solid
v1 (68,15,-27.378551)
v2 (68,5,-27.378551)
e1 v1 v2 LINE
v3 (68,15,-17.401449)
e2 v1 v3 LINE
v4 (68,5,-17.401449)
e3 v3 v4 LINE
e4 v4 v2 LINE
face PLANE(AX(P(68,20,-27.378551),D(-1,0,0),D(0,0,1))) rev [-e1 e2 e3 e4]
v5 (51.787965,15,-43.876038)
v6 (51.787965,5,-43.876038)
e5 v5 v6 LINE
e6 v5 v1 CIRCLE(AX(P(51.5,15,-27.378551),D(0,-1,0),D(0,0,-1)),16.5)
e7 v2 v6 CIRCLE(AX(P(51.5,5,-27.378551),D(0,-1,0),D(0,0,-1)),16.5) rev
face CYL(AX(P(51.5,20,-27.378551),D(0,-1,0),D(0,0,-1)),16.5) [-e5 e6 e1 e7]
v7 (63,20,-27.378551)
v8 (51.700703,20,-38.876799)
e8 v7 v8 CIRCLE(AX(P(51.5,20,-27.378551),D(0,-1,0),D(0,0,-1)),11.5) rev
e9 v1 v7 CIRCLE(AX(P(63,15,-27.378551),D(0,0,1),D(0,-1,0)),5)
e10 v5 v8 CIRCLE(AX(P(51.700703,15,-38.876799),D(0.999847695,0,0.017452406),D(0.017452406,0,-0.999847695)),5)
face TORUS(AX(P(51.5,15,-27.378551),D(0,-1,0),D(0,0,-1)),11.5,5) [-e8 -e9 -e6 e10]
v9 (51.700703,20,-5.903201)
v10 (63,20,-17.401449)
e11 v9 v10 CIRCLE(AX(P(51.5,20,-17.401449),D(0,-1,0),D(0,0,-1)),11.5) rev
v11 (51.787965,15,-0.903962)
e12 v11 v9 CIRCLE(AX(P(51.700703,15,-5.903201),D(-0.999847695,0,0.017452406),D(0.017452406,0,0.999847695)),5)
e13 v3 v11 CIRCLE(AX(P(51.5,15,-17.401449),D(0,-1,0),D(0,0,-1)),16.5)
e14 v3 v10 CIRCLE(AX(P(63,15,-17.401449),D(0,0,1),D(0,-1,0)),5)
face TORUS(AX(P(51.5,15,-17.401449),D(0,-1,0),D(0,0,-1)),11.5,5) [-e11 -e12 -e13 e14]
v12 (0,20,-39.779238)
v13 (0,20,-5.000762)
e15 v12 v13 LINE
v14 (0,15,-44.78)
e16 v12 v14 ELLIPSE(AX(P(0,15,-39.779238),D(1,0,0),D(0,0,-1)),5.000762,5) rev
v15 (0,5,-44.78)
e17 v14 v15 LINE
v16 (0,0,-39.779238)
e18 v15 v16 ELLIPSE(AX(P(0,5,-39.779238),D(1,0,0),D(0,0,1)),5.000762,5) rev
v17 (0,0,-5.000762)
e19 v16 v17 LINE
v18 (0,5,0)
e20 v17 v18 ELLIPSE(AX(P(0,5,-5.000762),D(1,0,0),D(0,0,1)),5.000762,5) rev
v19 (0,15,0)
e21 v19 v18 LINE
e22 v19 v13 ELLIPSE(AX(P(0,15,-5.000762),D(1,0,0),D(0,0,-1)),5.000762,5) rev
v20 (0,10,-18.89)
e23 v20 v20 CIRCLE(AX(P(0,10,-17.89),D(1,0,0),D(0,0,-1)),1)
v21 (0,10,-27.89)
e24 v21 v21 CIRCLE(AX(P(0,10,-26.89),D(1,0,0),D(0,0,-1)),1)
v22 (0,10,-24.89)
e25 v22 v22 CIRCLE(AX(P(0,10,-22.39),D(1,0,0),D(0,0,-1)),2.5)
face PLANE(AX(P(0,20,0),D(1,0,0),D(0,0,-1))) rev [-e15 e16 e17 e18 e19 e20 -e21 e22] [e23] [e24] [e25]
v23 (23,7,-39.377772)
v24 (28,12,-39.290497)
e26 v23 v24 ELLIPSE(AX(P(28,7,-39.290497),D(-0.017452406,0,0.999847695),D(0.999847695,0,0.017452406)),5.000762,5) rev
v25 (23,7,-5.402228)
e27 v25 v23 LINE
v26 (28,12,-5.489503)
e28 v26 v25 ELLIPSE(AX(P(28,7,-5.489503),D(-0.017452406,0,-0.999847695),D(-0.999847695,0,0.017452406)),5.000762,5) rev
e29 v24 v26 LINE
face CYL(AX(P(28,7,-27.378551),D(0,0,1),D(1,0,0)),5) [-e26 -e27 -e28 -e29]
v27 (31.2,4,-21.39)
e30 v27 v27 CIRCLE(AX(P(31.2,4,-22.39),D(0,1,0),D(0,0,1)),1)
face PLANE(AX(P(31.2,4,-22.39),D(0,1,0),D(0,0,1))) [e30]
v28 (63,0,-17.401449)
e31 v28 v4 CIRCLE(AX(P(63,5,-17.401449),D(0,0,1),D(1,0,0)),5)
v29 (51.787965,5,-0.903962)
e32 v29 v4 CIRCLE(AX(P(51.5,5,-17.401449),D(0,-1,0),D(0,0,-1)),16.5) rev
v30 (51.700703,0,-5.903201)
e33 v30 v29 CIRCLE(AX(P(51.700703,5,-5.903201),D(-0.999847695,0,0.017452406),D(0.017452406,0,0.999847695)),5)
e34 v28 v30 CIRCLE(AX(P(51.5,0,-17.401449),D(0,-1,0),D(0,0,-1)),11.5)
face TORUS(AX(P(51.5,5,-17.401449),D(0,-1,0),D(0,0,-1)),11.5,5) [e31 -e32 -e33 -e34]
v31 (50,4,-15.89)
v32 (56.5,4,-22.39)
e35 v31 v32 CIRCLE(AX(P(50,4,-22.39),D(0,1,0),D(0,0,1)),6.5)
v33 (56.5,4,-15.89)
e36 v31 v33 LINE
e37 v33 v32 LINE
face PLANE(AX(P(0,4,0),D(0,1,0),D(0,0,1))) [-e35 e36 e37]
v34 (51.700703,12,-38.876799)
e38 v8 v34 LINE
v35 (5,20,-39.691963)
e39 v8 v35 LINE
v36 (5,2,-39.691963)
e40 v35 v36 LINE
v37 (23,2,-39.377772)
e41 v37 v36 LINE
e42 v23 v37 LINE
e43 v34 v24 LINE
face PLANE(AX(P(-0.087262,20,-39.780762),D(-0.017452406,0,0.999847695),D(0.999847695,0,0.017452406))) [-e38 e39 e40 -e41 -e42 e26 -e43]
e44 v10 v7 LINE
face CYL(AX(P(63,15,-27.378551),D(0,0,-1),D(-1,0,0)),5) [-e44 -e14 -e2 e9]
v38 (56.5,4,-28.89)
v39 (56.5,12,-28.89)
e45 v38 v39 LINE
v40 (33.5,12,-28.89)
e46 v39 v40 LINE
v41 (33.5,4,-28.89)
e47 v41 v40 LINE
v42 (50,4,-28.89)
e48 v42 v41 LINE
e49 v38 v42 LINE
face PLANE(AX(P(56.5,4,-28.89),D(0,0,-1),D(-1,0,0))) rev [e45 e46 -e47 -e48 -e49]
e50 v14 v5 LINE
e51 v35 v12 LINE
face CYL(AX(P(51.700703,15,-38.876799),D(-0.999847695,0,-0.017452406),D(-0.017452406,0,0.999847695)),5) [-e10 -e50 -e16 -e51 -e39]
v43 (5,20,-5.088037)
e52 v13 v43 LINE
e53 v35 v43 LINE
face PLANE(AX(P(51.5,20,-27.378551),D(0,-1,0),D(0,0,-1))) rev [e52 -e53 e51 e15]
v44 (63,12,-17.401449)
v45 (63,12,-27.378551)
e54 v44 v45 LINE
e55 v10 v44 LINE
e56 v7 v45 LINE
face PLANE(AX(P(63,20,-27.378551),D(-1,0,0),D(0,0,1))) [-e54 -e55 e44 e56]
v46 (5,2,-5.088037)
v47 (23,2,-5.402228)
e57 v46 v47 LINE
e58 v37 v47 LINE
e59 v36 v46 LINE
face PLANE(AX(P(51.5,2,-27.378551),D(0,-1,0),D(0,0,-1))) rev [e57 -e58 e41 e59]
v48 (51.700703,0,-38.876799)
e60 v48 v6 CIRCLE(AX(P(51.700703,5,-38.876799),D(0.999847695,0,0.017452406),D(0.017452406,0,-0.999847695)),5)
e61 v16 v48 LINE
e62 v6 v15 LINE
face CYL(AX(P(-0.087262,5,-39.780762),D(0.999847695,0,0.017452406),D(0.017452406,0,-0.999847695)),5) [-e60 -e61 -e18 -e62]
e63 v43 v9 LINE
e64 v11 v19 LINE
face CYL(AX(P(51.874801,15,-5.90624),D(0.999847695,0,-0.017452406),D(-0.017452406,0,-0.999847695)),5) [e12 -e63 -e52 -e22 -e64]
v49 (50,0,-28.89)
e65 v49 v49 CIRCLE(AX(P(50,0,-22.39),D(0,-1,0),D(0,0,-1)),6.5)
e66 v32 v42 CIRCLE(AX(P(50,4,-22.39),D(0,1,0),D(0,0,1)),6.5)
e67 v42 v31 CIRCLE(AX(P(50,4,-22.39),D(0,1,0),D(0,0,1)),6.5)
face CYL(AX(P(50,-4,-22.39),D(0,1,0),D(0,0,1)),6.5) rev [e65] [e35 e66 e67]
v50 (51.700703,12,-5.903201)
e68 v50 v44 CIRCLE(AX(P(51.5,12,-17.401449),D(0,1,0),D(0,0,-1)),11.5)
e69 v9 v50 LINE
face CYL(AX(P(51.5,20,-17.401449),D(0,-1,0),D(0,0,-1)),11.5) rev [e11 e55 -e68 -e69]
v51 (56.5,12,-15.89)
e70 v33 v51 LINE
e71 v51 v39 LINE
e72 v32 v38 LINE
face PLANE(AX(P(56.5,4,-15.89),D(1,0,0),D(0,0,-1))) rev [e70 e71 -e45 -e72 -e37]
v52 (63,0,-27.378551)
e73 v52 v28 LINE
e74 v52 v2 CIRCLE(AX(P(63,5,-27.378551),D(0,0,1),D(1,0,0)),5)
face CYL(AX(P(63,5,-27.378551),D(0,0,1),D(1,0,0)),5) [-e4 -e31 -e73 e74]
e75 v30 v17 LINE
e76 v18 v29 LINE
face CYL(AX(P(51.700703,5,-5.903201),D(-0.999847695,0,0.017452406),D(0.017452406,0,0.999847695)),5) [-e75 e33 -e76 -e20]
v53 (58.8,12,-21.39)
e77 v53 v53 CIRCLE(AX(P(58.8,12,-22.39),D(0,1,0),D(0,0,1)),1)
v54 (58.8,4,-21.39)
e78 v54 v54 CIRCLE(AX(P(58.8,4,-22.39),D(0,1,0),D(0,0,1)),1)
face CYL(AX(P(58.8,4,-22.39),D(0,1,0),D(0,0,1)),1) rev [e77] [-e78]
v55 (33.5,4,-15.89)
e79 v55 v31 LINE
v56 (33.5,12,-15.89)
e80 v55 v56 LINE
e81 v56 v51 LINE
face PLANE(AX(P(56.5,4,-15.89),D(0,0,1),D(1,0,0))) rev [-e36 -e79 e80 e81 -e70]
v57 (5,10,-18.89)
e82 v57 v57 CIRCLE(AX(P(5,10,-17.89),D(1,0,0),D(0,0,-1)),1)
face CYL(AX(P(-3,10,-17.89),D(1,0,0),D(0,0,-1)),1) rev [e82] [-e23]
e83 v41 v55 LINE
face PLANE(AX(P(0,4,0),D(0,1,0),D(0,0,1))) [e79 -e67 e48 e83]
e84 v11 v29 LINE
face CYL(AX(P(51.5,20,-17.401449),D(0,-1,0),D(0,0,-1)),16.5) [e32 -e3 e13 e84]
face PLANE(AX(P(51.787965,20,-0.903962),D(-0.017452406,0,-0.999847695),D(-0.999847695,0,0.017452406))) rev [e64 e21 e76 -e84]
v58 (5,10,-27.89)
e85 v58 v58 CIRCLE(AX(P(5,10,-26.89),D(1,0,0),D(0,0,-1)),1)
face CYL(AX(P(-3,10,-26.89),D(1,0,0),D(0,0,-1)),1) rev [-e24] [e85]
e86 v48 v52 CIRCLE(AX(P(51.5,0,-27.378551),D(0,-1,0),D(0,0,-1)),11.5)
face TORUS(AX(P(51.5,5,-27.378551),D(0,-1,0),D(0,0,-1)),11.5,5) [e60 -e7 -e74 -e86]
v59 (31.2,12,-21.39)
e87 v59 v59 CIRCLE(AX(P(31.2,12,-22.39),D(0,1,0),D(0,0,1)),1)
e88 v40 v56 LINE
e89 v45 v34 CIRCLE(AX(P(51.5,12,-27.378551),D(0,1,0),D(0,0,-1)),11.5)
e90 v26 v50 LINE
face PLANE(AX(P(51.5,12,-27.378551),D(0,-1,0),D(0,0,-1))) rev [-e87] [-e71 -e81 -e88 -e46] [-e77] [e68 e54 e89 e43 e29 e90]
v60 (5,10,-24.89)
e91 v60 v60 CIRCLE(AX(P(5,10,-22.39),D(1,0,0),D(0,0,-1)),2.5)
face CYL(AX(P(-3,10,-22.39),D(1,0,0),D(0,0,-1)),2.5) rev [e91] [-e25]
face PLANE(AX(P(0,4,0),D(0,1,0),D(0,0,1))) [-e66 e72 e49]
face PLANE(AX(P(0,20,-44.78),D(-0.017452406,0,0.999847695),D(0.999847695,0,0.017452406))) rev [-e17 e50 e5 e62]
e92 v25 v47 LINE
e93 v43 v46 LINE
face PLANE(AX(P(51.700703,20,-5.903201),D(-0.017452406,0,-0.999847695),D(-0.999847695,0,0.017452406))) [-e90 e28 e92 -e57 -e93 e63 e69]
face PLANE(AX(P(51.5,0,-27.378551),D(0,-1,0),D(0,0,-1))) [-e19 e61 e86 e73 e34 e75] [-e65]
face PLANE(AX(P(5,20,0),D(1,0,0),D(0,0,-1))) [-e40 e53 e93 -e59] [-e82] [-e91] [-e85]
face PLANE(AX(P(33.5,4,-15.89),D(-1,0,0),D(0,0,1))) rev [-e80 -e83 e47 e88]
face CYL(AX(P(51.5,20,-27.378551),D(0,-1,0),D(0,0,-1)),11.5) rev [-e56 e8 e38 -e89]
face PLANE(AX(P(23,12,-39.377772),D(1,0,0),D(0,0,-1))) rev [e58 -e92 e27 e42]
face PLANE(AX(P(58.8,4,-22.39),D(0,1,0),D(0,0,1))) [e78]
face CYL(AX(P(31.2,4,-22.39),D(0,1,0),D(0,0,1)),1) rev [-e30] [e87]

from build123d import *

# Parameters (mm, degrees)
BOSS_EXTRUDE1_DEPTH      = 20
SHELL1_T                 = -5
SHELL1_THICKNESS_2_DEPTH = 3
BOSS_EXTRUDE2_DEPTH      = 10
SKETCH7_W                = 23
SKETCH7_H                = 13
CUT_EXTRUDE1_DEPTH       = 8
SKETCH8_R                = 6.5
CUT_EXTRUDE2_DEPTH       = 8
SKETCH9_R                = 1
CUT_EXTRUDE3_DEPTH       = 8
SKETCH10_R               = 2.5
SKETCH10_R_2             = 1
CUT_EXTRUDE4_DEPTH       = 8
FILLET1_R                = 5


with BuildPart() as part:
    # Sketch2 → Boss-Extrude1 (new body)
    with BuildSketch(Plane(origin=(0, 0, 0), x_dir=(1, 0, 0), z_dir=(0, 1, 0))):
        with BuildLine():
            Line((0, 0), (0, 44.78))
            Line((0, 44.78), (51.787964706, 43.876037714))
            ThreePointArc((51.787964706, 43.876037714), (63.268632411, 38.943553604), (68, 27.378550743))
            Line((68, 27.378550743), (68, 17.401449257))
            ThreePointArc((68, 17.401449257), (63.268632411, 5.836446396), (51.787964706, 0.903962286))
            Line((51.787964706, 0.903962286), (0, 0))
        make_face()
    extrude(amount=BOSS_EXTRUDE1_DEPTH)

    # Shell1
    shell1_openings = [part.faces().sort_by_distance(p)[0] for p in [
        (32.484056968, 20, -22.39),
    ]]
    offset(amount=SHELL1_T, openings=shell1_openings, kind=Kind.INTERSECTION)

    # Shell1 thickness 2 face (on inner face of the shell) → Shell1 thickness 2 (cut)
    with BuildSketch(Plane(origin=(32.938254764, 5, -22.39), x_dir=(0, 0, -1), z_dir=(0, -1, 0))):
        with BuildLine():
            Line((-17.301963035, -27.938254764), (-16.486799238, 18.76244791))
            ThreePointArc((-16.486799238, 18.76244791), (-13.049007283, 26.764125401), (-4.988550743, 30.061745236))
            Line((-4.988550743, 30.061745236), (4.988550743, 30.061745236))
            ThreePointArc((4.988550743, 30.061745236), (13.049007283, 26.764125401), (16.486799238, 18.76244791))
            Line((16.486799238, 18.76244791), (17.301963035, -27.938254764))
            Line((17.301963035, -27.938254764), (-17.301963035, -27.938254764))
        make_face()
    extrude(amount=SHELL1_THICKNESS_2_DEPTH, mode=Mode.SUBTRACT)

    # Sketch6 → Boss-Extrude2 (add)
    with BuildSketch(Plane(origin=(0, 2, 0), x_dir=(1, 0, 0), z_dir=(0, 1, 0))):
        with BuildLine():
            Line((23, 39.377771866), (23, 5.402228134))
            Line((23, 5.402228134), (51.700702674, 5.903200762))
            ThreePointArc((51.700702674, 5.903200762), (59.702380165, 9.340992717), (63, 17.401449257))
            Line((63, 17.401449257), (63, 27.378550743))
            ThreePointArc((63, 27.378550743), (59.702380165, 35.439007283), (51.700702674, 38.876799238))
            Line((51.700702674, 38.876799238), (23, 39.377771866))
        make_face()
    extrude(amount=BOSS_EXTRUDE2_DEPTH)

    # Sketch7 → Cut-Extrude1 (cut)
    with BuildSketch(Plane(origin=(0, 12, 0), x_dir=(1, 0, 0), z_dir=(0, 1, 0))):
        with Locations((45, 22.39)):
            Rectangle(SKETCH7_W, SKETCH7_H)
    extrude(amount=-CUT_EXTRUDE1_DEPTH, mode=Mode.SUBTRACT)

    # Sketch8 → Cut-Extrude2 (cut)
    with BuildSketch(Plane(origin=(0, 4, 0), x_dir=(1, 0, 0), z_dir=(0, 1, 0))):
        with Locations(Location((50, 22.39, 0), (0, 0, 90))):
            Circle(SKETCH8_R)
    extrude(amount=-CUT_EXTRUDE2_DEPTH, mode=Mode.SUBTRACT)

    # Sketch9 → Cut-Extrude3 (cut)
    with BuildSketch(Plane(origin=(0, 12, 0), x_dir=(1, 0, 0), z_dir=(0, 1, 0))):
        with Locations(Location((31.2, 22.39, 0), (0, 0, 270))):
            Circle(SKETCH9_R)
        with Locations(Location((58.8, 22.39, 0), (0, 0, 270))):
            Circle(SKETCH9_R)
    extrude(amount=-CUT_EXTRUDE3_DEPTH, mode=Mode.SUBTRACT)

    # Sketch10 → Cut-Extrude4 (cut)
    with BuildSketch(Plane(origin=(5, 0, 0), x_dir=(0, 0, -1), z_dir=(1, 0, 0))):
        with Locations((22.39, 10)):
            Circle(SKETCH10_R)
        with Locations((17.89, 10)):
            Circle(SKETCH10_R_2)
        with Locations((26.89, 10)):
            Circle(SKETCH10_R_2)
    extrude(amount=-CUT_EXTRUDE4_DEPTH, mode=Mode.SUBTRACT)

    # Fillet1
    fillet1_edges = [part.edges().sort_by_distance(p)[0] for p in [
        (68, 20, -22.39),
        (63.268632411, 20, -38.943553604),
        (25.893982353, 20, -44.328018857),
        (23, 12, -22.39),
        (25.893982353, 20, -0.451981143),
        (25.893982353, 0, -44.328018857),
        (63.268632411, 0, -38.943553604),
        (68, 0, -22.39),
        (63.268632411, 0, -5.836446396),
        (25.893982353, 0, -0.451981143),
        (63.268632411, 20, -5.836446396),
    ]]
    fillet(fillet1_edges, radius=FILLET1_R - 0.0001)  # a hair under: the kernel refuses the full size


solid = part.part
